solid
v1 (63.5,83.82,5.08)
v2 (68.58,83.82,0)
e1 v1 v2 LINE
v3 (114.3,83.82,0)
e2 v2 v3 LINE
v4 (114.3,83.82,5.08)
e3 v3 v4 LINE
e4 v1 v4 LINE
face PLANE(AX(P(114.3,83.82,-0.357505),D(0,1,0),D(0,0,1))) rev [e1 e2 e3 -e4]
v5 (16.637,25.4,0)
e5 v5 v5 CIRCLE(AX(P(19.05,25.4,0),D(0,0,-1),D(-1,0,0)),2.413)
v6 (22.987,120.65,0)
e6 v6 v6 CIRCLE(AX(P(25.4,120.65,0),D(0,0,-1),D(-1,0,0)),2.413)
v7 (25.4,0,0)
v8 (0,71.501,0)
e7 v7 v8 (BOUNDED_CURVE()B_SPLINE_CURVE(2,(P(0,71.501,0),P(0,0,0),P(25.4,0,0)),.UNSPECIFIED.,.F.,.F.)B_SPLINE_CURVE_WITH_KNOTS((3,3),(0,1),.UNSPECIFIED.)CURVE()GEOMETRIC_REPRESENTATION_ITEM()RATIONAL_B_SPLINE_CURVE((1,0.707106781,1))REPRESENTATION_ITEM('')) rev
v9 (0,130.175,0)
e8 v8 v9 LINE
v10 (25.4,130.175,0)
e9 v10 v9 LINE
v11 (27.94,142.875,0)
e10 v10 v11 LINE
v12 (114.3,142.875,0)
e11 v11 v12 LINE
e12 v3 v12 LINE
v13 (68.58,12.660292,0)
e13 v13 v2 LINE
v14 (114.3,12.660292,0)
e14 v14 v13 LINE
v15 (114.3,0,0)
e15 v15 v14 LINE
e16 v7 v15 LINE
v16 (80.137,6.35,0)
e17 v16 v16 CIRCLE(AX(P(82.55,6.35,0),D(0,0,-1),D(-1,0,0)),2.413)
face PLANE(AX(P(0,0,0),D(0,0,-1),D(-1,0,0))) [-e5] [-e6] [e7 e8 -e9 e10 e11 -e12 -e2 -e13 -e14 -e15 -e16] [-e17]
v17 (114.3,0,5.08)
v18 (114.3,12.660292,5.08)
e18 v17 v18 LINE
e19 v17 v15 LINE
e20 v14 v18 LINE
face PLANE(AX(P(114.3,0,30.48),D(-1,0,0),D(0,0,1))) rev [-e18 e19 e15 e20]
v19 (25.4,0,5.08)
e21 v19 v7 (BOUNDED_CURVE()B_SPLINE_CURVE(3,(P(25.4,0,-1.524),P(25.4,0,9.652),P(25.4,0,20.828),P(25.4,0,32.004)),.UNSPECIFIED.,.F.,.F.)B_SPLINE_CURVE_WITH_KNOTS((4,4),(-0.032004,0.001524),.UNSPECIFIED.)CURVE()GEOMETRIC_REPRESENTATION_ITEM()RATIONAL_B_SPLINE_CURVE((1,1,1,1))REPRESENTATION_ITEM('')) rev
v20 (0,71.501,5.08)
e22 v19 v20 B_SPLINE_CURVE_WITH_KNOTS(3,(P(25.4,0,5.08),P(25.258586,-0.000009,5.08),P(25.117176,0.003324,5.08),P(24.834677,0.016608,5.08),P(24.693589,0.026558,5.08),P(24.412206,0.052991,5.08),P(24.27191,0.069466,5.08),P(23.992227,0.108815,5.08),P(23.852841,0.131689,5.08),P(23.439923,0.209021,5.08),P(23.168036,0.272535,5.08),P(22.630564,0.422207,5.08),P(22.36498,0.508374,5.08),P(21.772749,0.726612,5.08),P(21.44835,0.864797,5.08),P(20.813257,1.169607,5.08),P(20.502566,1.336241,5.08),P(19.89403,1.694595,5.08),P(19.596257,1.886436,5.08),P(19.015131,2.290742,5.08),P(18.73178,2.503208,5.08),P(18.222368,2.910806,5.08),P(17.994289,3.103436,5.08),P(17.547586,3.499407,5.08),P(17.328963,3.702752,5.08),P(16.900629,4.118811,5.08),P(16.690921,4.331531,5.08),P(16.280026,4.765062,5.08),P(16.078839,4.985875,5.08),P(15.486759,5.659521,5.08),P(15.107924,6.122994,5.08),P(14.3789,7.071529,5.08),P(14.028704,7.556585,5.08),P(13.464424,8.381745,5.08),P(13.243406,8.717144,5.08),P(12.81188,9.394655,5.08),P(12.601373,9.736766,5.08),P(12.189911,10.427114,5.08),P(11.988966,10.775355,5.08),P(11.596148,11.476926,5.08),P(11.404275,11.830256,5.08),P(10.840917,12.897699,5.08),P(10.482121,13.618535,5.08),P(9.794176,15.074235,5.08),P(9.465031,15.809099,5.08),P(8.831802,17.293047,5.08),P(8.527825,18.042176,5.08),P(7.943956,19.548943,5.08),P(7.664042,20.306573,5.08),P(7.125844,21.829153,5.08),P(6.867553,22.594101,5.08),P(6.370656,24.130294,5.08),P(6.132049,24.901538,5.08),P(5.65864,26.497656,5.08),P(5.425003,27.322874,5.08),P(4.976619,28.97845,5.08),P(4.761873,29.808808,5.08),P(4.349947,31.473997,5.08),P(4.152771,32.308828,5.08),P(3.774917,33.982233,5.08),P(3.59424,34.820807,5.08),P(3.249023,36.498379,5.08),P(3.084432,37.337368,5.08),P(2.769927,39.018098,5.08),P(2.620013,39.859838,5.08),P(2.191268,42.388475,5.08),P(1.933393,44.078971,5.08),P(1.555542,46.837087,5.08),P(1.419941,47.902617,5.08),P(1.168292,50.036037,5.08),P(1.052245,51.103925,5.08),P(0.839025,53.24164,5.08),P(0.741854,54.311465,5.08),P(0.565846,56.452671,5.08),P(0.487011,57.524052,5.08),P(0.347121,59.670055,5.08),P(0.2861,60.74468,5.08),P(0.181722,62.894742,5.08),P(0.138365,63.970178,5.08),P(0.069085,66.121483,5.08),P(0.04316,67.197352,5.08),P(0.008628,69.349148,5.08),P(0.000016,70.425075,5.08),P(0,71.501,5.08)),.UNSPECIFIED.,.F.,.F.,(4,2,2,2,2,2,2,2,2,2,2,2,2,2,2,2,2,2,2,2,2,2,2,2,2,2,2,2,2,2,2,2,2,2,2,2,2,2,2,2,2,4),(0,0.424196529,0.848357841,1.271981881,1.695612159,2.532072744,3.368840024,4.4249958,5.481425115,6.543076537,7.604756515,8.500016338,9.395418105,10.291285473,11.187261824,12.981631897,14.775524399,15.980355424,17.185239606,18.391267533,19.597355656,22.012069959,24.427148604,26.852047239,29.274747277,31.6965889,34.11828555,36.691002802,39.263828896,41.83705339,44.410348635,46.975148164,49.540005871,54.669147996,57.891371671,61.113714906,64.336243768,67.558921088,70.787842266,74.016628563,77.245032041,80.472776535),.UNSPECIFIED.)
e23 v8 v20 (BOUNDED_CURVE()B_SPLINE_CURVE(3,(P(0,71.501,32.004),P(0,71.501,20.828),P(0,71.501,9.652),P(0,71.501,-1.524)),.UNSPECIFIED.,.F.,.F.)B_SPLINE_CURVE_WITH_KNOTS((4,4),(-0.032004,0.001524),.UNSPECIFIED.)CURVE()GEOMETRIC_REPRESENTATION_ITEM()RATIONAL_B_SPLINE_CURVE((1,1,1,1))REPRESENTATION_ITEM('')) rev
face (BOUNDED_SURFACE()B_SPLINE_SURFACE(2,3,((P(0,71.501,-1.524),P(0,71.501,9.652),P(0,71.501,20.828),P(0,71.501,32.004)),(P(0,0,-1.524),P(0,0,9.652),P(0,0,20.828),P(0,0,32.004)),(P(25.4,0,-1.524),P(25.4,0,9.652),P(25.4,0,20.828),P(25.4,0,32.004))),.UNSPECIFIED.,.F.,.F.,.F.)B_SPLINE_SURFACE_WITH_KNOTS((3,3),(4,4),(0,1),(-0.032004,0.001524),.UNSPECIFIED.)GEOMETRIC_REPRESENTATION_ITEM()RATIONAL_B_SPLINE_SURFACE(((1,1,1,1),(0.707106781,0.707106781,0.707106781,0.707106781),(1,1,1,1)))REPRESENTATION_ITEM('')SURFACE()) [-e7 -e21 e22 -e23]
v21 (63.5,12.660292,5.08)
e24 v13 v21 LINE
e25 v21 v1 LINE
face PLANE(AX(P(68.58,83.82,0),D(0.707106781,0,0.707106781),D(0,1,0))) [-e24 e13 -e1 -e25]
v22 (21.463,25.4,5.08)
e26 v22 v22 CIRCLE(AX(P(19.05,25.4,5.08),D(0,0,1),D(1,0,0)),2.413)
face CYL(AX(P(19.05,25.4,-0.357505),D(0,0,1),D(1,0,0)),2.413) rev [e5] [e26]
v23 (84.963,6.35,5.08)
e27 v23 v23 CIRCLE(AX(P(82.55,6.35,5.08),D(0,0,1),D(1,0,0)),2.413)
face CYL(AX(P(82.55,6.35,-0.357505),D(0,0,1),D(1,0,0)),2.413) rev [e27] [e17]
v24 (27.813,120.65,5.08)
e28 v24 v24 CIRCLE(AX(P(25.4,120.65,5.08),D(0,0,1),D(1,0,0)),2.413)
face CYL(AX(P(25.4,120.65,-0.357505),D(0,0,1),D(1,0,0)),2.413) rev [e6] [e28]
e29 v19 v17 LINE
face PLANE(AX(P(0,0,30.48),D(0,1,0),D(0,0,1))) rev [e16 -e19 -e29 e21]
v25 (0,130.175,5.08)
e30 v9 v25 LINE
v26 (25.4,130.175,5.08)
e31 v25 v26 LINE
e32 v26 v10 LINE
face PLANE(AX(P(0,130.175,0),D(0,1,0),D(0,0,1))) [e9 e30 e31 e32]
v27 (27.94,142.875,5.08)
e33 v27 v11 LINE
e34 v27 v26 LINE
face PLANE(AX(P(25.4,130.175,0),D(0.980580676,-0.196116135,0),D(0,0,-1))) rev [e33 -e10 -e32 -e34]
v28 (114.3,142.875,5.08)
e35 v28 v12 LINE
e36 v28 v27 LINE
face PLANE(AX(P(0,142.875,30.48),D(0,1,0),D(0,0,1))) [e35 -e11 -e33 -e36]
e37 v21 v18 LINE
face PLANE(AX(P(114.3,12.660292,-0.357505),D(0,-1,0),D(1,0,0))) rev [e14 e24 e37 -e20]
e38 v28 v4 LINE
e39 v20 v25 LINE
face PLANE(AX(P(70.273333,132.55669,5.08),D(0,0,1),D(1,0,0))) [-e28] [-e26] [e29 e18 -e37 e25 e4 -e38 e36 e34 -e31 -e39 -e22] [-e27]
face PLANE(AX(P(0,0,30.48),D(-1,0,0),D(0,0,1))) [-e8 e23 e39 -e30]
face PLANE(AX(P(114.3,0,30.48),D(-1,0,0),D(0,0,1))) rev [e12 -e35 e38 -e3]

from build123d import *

# Parameters (mm, degrees)
SKETCH2_W                      = 114.3
SKETCH2_H                      = 142.875
BOSS_EXTRUDE2_DEPTH            = 30.48
FILLET1_SIZE                   = 25.4
FILLET1_SIZE_2                 = 71.501
BOSS_EXTRUDE3_DEPTH            = 11.43
CUT_EXTRUDE2_DEPTH             = 25.4
FILLET2_R                      = 1.27
SKETCH7_W                      = 27.94
SKETCH7_H                      = 30.48
CUT_EXTRUDE4_DEPTH             = 12.7
BOSS_EXTRUDE4_DEPTH            = 11.43
CUT_EXTRUDE6_DEPTH             = 25.4
CUT_EXTRUDE7_DEPTH             = 171.262283535
CUT_EXTRUDE7_DEPTH_BACK        = 171.262283535
SKETCH11_R                     = 3.175
CUT_EXTRUDE8_REACH             = 185.225
SKETCH12_R                     = 3.175
CUT_EXTRUDE8_DIRECTION_2_DEPTH = 184.224735996
CHAMFER1_SIZE2                 = 12.7
CHAMFER1_SIZE                  = 2.54
SKETCH13_W                     = 7.62
SKETCH13_H                     = 5.08
CUT_EXTRUDE9_DEPTH             = 25.4
FILLET4_R                      = 1.27
CUT_EXTRUDE10_DEPTH            = 195.431359314
CHAMFER2_SIZE                  = 12.7
CUT_EXTRUDE11_REACH            = 196.431
SKETCH15_R                     = 3.175
BOSS_EXTRUDE5_DEPTH            = 1.27
CHAMFER3_SIZE                  = 1.27
BOSS_EXTRUDE6_DEPTH            = 1.27
CHAMFER4_SIZE                  = 1.27
FILLET5_R                      = 15.24
CUT_EXTRUDE12_DEPTH            = 16.51
SKETCH20_W                     = 2.54
SKETCH20_H                     = 2.54
CUT_EXTRUDE13_DEPTH            = 171.777226453
FILLET6_R                      = 1.27
CUT_EXTRUDE14_DEPTH            = 1.27
CUT_EXTRUDE14_DEPTH_BACK       = 1.27
SKETCH21_W                     = 5.08
SKETCH21_H                     = 33.02
SKETCH21_H_2                   = 10.329873089
SKETCH21_H_3                   = 10.221702335
SKETCH21_W_2                   = 7.62
SKETCH21_H_4                   = 1.402013576
SKETCH21_W_3                   = 1.485233779
FILLET7_R                      = 11.43
SKETCH22_R                     = 1.27
CUT_EXTRUDE15_DEPTH            = 12.7
SKETCH24_W                     = 120.524481761
SKETCH24_H                     = 158.415517923
CUT_EXTRUDE17_DEPTH            = 25.4
SKETCH25_W                     = 45.72
SKETCH25_H                     = 71.15970777
CUT_EXTRUDE18_DEPTH            = 184.039782773
CHAMFER5_SIZE                  = 5.08
SKETCH27_R                     = 2.413
CUT_EXTRUDE20_DEPTH            = 184.039782773


# Some blends are built 0.0001 mm under size
with BuildPart() as part:
    # Sketch2 → Boss-Extrude2 (new body)
    with BuildSketch(Plane.XY):
        with Locations((57.15, 71.4375)):
            Rectangle(SKETCH2_W, SKETCH2_H)
    extrude(amount=BOSS_EXTRUDE2_DEPTH)

    # Fillet1
    # an asymmetric fillet: 71.501, 25.4 mm, written as the material it takes off along each edge
    with BuildSketch(Plane(origin=(0, 0, -178.7525), x_dir=(1, 0, 0), z_dir=(0, 0, 1))) as fillet1_piece_1:
        with BuildLine():
            Bezier((FILLET1_SIZE, 0), (0, 0), (0, FILLET1_SIZE_2), weights=[1, 0.707106781, 1])
            Line((0, FILLET1_SIZE_2), (0, 0))
            Line((0, 0), (FILLET1_SIZE, 0))
        make_face()
    extrude(amount=387.985, mode=Mode.SUBTRACT)

    # Sketch3 → Boss-Extrude3 (add)
    with BuildSketch(Plane(origin=(0, 142.875, 0), x_dir=(1, 0, 0), z_dir=(0, 1, 0))):
        with BuildLine():
            Line((33.866582, -7.62), (33.866582, -27.94))
            ThreePointArc((33.866582, -27.94), (28.786582, -17.78), (33.866582, -7.62))
        make_face()
        with BuildLine():
            Line((49.106582, -7.62), (49.106582, -27.94))
            ThreePointArc((49.106582, -27.94), (54.186582, -17.78), (49.106582, -7.62))
        make_face()
    extrude(amount=BOSS_EXTRUDE3_DEPTH)

    # Sketch5 → Cut-Extrude2 (cut)
    with BuildSketch(Plane.XY.offset(30.48)):
        with BuildLine():
            Line((62.653333333, 142.875), (77.893333333, 142.875))
            ThreePointArc((77.893333333, 142.875), (70.273333333, 119.729689625), (62.653333333, 142.875))
        make_face()
        with BuildLine():
            Line((91.44, 142.875), (106.68, 142.875))
            ThreePointArc((106.68, 142.875), (99.06, 119.729689625), (91.44, 142.875))
        make_face()
    extrude(amount=-CUT_EXTRUDE2_DEPTH, mode=Mode.SUBTRACT)

    # Fillet2
    fillet2_edges = [part.edges().sort_by_distance(p)[0] for p in [
        (77.893333333, 142.875, 17.78),
        (62.653333333, 142.875, 17.78),
        (91.44, 142.875, 17.78),
    ]]
    fillet(fillet2_edges, radius=FILLET2_R)

    # Sketch7 → Cut-Extrude4 (cut)
    with BuildSketch(Plane(origin=(0, 142.875, 0), x_dir=(1, 0, 0), z_dir=(0, 1, 0))):
        with Locations((13.97, -15.24)):
            Rectangle(SKETCH7_W, SKETCH7_H)
    extrude(amount=-CUT_EXTRUDE4_DEPTH, mode=Mode.SUBTRACT)

    # Sketch8 → Boss-Extrude4 (add)
    with BuildSketch(Plane(origin=(0, 130.175, 0), x_dir=(1, 0, 0), z_dir=(0, 1, 0))):
        with BuildLine():
            Line((5.08, -7.62), (5.08, -27.94))
            ThreePointArc((5.08, -27.94), (0, -17.78), (5.08, -7.62))
        make_face()
        with BuildLine():
            Line((20.32, -7.62), (20.32, -27.94))
            ThreePointArc((20.32, -27.94), (25.4, -17.78), (20.32, -7.62))
        make_face()
    extrude(amount=BOSS_EXTRUDE4_DEPTH)

    # Sketch10 → Cut-Extrude6 (cut)
    with BuildSketch(Plane.XY.offset(30.48)):
        Polygon((63.5, 109.855), (12.7, 109.855), (12.7, 61.2775), (38.1, 12.7), (63.5, 12.7), (63.5, 94.615), (106.68, 94.615), (106.68, 109.855), align=None)
    extrude(amount=-CUT_EXTRUDE6_DEPTH, mode=Mode.SUBTRACT)

    # Sketch11 → Cut-Extrude7 (cut, two sides: drawn at the far end of the back side and taken through both)
    with BuildSketch(Plane.ZY.offset(-49.106582).offset(-CUT_EXTRUDE7_DEPTH_BACK)):
        with Locations((17.78, 149.225)):
            Circle(SKETCH11_R)
        with BuildLine():
            Line((22.044917923, 151.984868677), (27.94, 142.875))
            Line((27.94, 142.875), (27.94, 154.305))
            Line((27.94, 154.305), (17.78, 154.305))
            ThreePointArc((17.78, 154.305), (20.207577715, 153.687428312), (22.044917923, 151.984868677))
        make_face()
    extrude(amount=CUT_EXTRUDE7_DEPTH + CUT_EXTRUDE7_DEPTH_BACK, mode=Mode.SUBTRACT)

    # Cut-Extrude8: up to this face of the body (flat: up to its plane)
    cut_extrude8_end = Plane(part.part.faces().sort_by_distance((27.94, 136.525, 15.24))[0])
    # Sketch12 → Cut-Extrude8 (cut, up to the picked face)
    with BuildSketch(Plane.ZY.offset(-20.32), mode=Mode.PRIVATE) as cut_extrude8_sk1:
        with Locations((17.78, 136.525)):
            Circle(SKETCH12_R)
    cut_extrude8_tool1 = split(extrude(cut_extrude8_sk1.sketch, amount=-CUT_EXTRUDE8_REACH, mode=Mode.PRIVATE), bisect_by=cut_extrude8_end, keep=Keep.BOTH, mode=Mode.PRIVATE)
    # Sketch12 → Cut-Extrude8 (cut, up to the picked face)
    with BuildSketch(Plane.ZY.offset(-20.32), mode=Mode.PRIVATE) as cut_extrude8_sk2:
        with BuildLine():
            Line((22.044917923, 139.284868677), (27.94, 130.175))
            Line((27.94, 130.175), (27.94, 141.605))
            Line((27.94, 141.605), (17.78, 141.605))
            ThreePointArc((17.78, 141.605), (20.207577715, 140.987428312), (22.044917923, 139.284868677))
        make_face()
    cut_extrude8_tool2 = split(extrude(cut_extrude8_sk2.sketch, amount=-CUT_EXTRUDE8_REACH, mode=Mode.PRIVATE), bisect_by=cut_extrude8_end, keep=Keep.BOTH, mode=Mode.PRIVATE)
    add(cut_extrude8_tool1.solids().sort_by(Axis((20.32, 136.525, 17.78), (1, 0, 0)))[0], mode=Mode.SUBTRACT)
    add(cut_extrude8_tool2.solids().sort_by(Axis((20.32, 137.885407, 25.333291), (1, 0, 0)))[0], mode=Mode.SUBTRACT)

    # Sketch12 → Cut-Extrude8 direction 2 (cut)
    with BuildSketch(Plane.ZY.offset(-20.32)):
        with Locations((17.78, 136.525)):
            Circle(SKETCH12_R)
        with BuildLine():
            Line((22.044917923, 139.284868677), (27.94, 130.175))
            Line((27.94, 130.175), (27.94, 141.605))
            Line((27.94, 141.605), (17.78, 141.605))
            ThreePointArc((17.78, 141.605), (20.207577715, 140.987428312), (22.044917923, 139.284868677))
        make_face()
    extrude(amount=CUT_EXTRUDE8_DIRECTION_2_DEPTH, mode=Mode.SUBTRACT)

    # Chamfer1
    chamfer1_edges = [part.edges().sort_by_distance(p)[0] for p in [
        (27.94, 130.175, 15.24),
    ]]
    chamfer1_side = [part.faces().sort_by_distance(p)[0] for p in [
        (27.8892, 130.175, 15.24),
    ]]
    chamfer(chamfer1_edges, length=CHAMFER1_SIZE - 0.0001, length2=CHAMFER1_SIZE2 - 0.0001, reference=chamfer1_side[0])  # a hair under: the kernel refuses the full size

    # Sketch13 → Cut-Extrude9 (cut)
    with BuildSketch(Plane.XY.offset(30.48)):
        with Locations((110.49, 140.335)):
            Rectangle(SKETCH13_W, SKETCH13_H)
    extrude(amount=-CUT_EXTRUDE9_DEPTH, mode=Mode.SUBTRACT)

    # Fillet4
    fillet4_edges = [part.edges().sort_by_distance(p)[0] for p in [
        (110.768630723, 137.795, 17.78),
        (114.3, 137.795, 17.78),
    ]]
    fillet(fillet4_edges, radius=FILLET4_R)

    # Sketch14 → Cut-Extrude10 (cut, through all)
    with BuildSketch(Plane.XY.offset(30.48)):
        Polygon((114.3, 12.7), (81.28, 12.7), (81.28, 26.67), (111.76, 26.67), (111.76, 69.85), (81.28, 69.85), (81.28, 83.82), (114.3, 83.82), align=None)
    extrude(amount=-CUT_EXTRUDE10_DEPTH, mode=Mode.SUBTRACT)

    # Chamfer2
    chamfer2_edges = [part.edges().sort_by_distance(p)[0] for p in [
        (81.28, 76.835, 30.48),
        (81.28, 19.685, 30.48),
    ]]
    chamfer(chamfer2_edges, length=CHAMFER2_SIZE)

    # Cut-Extrude11: up to this face of the body (flat: up to its plane)
    cut_extrude11_end = Plane(part.part.faces().sort_by_distance((59.69, 109.855, 17.78))[0])
    # Sketch15 → Cut-Extrude11 (cut, up to the picked face)
    with BuildSketch(Plane.XZ, mode=Mode.PRIVATE) as cut_extrude11_sk1:
        with Locations(Location((99.06, 17.78, 0), (0, 0, 270))):
            Circle(SKETCH15_R)
    cut_extrude11_tool1 = split(extrude(cut_extrude11_sk1.sketch, amount=-CUT_EXTRUDE11_REACH, mode=Mode.PRIVATE), bisect_by=cut_extrude11_end, keep=Keep.BOTH, mode=Mode.PRIVATE)
    add(cut_extrude11_tool1.solids().sort_by(Axis((99.06, 0, 17.78), (0, 1, 0)))[0], mode=Mode.SUBTRACT)

    # Sketch16 → Boss-Extrude5 (add)
    with BuildSketch(Plane(origin=(0, 141.605, 0), x_dir=(1, 0, 0), z_dir=(0, 1, 0))):
        with BuildLine():
            Line((0.406992957, -14.590646171), (5.08, -14.605))
            Line((5.08, -14.605), (5.08, -7.62))
            ThreePointArc((5.08, -7.62), (2.151092977, -10.708185479), (0.406992957, -14.590646171))
        make_face()
        with BuildLine():
            Line((20.32, -14.605), (24.996722124, -14.605))
            ThreePointArc((24.996722124, -14.605), (23.253033275, -10.714344425), (20.32, -7.62))
            Line((20.32, -7.62), (20.32, -14.605))
        make_face()
    extrude(amount=BOSS_EXTRUDE5_DEPTH)

    # Chamfer3
    chamfer3_edges = [part.edges().sort_by_distance(p)[0] for p in [
        (22.658361062, 142.875, 14.605),
        (2.743496479, 142.875, 14.597823086),
    ]]
    chamfer(chamfer3_edges, length=CHAMFER3_SIZE - 0.0001)  # a hair under: the kernel refuses the full size

    # Sketch17 → Boss-Extrude6 (add)
    with BuildSketch(Plane(origin=(0, 154.305, 0), x_dir=(1, 0, 0), z_dir=(0, 1, 0))):
        with BuildLine():
            Line((29.150536334, -14.761394806), (33.866582, -14.761394806))
            Line((33.866582, -14.761394806), (33.866582, -7.62))
            ThreePointArc((33.866582, -7.62), (30.888902084, -10.781487273), (29.150536334, -14.761394806))
        make_face()
        with BuildLine():
            Line((49.106582, -14.761394806), (53.822627666, -14.761394806))
            ThreePointArc((53.822627666, -14.761394806), (52.084261916, -10.781487273), (49.106582, -7.62))
            Line((49.106582, -7.62), (49.106582, -14.761394806))
        make_face()
    extrude(amount=BOSS_EXTRUDE6_DEPTH)

    # Chamfer4
    chamfer4_edges = [part.edges().sort_by_distance(p)[0] for p in [
        (51.464604833, 155.575, 14.761394806),
        (31.508559167, 155.575, 14.761394806),
    ]]
    chamfer(chamfer4_edges, length=CHAMFER4_SIZE - 0.0001)  # a hair under: the kernel refuses the full size

    # Fillet5
    fillet5_edges = [part.edges().sort_by_distance(p)[0] for p in [
        (111.76, 48.26, 30.48),
    ]]
    fillet(fillet5_edges, radius=FILLET5_R)

    # Sketch19 → Cut-Extrude12 (cut)
    with BuildSketch(Plane.XY.offset(30.48)):
        Polygon((81.28, 52.07), (111.76, 52.07), (111.76, 57.15), (81.28, 57.15), (69.85, 57.15), (69.85, 52.07), align=None)
    extrude(amount=-CUT_EXTRUDE12_DEPTH, mode=Mode.SUBTRACT)

    # Sketch20 → Cut-Extrude13 (cut, through all)
    with BuildSketch(Plane.ZY.offset(-63.5)):
        with Locations((19.05, 39.37)):
            Rectangle(SKETCH20_W, SKETCH20_H)
    extrude(amount=-CUT_EXTRUDE13_DEPTH, mode=Mode.SUBTRACT)

    # Fillet6
    fillet6_edges = [part.edges().sort_by_distance(p)[0] for p in [
        (63.5, 38.1, 19.05),
    ]]
    fillet(fillet6_edges, radius=FILLET6_R)

    # Sketch21 → Cut-Extrude14 (cut, two sides: drawn at the far end of the back side and taken through both)
    with BuildSketch(Plane.XY.offset(17.78).offset(-CUT_EXTRUDE14_DEPTH_BACK)):
        Polygon((12.7, 109.855), (10.485930724, 130.175), (15.565930724, 130.175), (17.78, 109.855), align=None)
        Polygon((55.429725371, 142.875), (50.86041281, 121.653709764), (50.86041281, 109.855), (52.449738918, 109.855), (52.449738918, 121.653709764), (57.019051479, 142.875), align=None)
        with Locations((41.486582, 126.365)):
            Rectangle(SKETCH21_W, SKETCH21_H)
        with Locations((69.426582, 115.019936545)):
            Rectangle(SKETCH21_W, SKETCH21_H_2)
        with Locations((98.636582, 114.965851168)):
            Rectangle(SKETCH21_W, SKETCH21_H_3)
        with Locations((110.49, 102.445426643)):
            Rectangle(SKETCH21_W_2, SKETCH21_H_4)
        with Locations((84.636338767, 126.365)):
            Rectangle(SKETCH21_W_3, SKETCH21_H)
    extrude(amount=CUT_EXTRUDE14_DEPTH + CUT_EXTRUDE14_DEPTH_BACK, mode=Mode.SUBTRACT)

    # Fillet7
    fillet7_edges = [part.edges().sort_by_distance(p)[0] for p in [
        (63.5, 94.615, 17.78),
    ]]
    fillet(fillet7_edges, radius=FILLET7_R)

    # Sketch22 → Cut-Extrude15 (cut)
    with BuildSketch(Plane(origin=(0, 12.7, 0), x_dir=(1, 0, 0), z_dir=(0, 1, 0))):
        with Locations(Location((43.18, -11.908276952, 0), (0, 0, 180))):
            Circle(SKETCH22_R)
        with Locations(Location((48.26, -11.908276952, 0), (0, 0, 180))):
            Circle(SKETCH22_R)
        with Locations(Location((53.34, -11.908276952, 0), (0, 0, 180))):
            Circle(SKETCH22_R)
        with Locations(Location((58.42, -11.908276952, 0), (0, 0, 180))):
            Circle(SKETCH22_R)
        with Locations(Location((43.18, -22.068276952, 0), (0, 0, 180))):
            Circle(SKETCH22_R)
        with Locations(Location((48.26, -22.068276952, 0), (0, 0, 180))):
            Circle(SKETCH22_R)
        with Locations(Location((53.34, -22.068276952, 0), (0, 0, 180))):
            Circle(SKETCH22_R)
        with Locations(Location((58.42, -22.068276952, 0), (0, 0, 180))):
            Circle(SKETCH22_R)
    extrude(amount=-CUT_EXTRUDE15_DEPTH, mode=Mode.SUBTRACT)

    # Sketch24 → Cut-Extrude17 (cut)
    with BuildSketch(Plane.XY.offset(30.48)):
        with Locations((54.03775912, 79.207758962)):
            Rectangle(SKETCH24_W, SKETCH24_H)
    extrude(amount=-CUT_EXTRUDE17_DEPTH, mode=Mode.SUBTRACT)

    # Sketch25 → Cut-Extrude18 (cut, through all)
    with BuildSketch(Plane.XY.offset(5.08)):
        with Locations((91.44, 48.240146115)):
            Rectangle(SKETCH25_W, SKETCH25_H)
    extrude(amount=-CUT_EXTRUDE18_DEPTH, mode=Mode.SUBTRACT)

    # Chamfer5
    chamfer5_edges = [part.edges().sort_by_distance(p)[0] for p in [
        (68.58, 48.240146115, 5.08),
    ]]
    chamfer(chamfer5_edges, length=CHAMFER5_SIZE - 0.0001)  # a hair under: the kernel refuses the full size

    # Sketch27 → Cut-Extrude20 (cut, through all)
    with BuildSketch(Plane.XY.offset(5.08)):
        with Locations((25.4, 120.65)):
            Circle(SKETCH27_R)
        with Locations((19.05, 25.4)):
            Circle(SKETCH27_R)
        with Locations((82.55, 6.35)):
            Circle(SKETCH27_R)
    extrude(amount=-CUT_EXTRUDE20_DEPTH, mode=Mode.SUBTRACT)


solid = part.part
